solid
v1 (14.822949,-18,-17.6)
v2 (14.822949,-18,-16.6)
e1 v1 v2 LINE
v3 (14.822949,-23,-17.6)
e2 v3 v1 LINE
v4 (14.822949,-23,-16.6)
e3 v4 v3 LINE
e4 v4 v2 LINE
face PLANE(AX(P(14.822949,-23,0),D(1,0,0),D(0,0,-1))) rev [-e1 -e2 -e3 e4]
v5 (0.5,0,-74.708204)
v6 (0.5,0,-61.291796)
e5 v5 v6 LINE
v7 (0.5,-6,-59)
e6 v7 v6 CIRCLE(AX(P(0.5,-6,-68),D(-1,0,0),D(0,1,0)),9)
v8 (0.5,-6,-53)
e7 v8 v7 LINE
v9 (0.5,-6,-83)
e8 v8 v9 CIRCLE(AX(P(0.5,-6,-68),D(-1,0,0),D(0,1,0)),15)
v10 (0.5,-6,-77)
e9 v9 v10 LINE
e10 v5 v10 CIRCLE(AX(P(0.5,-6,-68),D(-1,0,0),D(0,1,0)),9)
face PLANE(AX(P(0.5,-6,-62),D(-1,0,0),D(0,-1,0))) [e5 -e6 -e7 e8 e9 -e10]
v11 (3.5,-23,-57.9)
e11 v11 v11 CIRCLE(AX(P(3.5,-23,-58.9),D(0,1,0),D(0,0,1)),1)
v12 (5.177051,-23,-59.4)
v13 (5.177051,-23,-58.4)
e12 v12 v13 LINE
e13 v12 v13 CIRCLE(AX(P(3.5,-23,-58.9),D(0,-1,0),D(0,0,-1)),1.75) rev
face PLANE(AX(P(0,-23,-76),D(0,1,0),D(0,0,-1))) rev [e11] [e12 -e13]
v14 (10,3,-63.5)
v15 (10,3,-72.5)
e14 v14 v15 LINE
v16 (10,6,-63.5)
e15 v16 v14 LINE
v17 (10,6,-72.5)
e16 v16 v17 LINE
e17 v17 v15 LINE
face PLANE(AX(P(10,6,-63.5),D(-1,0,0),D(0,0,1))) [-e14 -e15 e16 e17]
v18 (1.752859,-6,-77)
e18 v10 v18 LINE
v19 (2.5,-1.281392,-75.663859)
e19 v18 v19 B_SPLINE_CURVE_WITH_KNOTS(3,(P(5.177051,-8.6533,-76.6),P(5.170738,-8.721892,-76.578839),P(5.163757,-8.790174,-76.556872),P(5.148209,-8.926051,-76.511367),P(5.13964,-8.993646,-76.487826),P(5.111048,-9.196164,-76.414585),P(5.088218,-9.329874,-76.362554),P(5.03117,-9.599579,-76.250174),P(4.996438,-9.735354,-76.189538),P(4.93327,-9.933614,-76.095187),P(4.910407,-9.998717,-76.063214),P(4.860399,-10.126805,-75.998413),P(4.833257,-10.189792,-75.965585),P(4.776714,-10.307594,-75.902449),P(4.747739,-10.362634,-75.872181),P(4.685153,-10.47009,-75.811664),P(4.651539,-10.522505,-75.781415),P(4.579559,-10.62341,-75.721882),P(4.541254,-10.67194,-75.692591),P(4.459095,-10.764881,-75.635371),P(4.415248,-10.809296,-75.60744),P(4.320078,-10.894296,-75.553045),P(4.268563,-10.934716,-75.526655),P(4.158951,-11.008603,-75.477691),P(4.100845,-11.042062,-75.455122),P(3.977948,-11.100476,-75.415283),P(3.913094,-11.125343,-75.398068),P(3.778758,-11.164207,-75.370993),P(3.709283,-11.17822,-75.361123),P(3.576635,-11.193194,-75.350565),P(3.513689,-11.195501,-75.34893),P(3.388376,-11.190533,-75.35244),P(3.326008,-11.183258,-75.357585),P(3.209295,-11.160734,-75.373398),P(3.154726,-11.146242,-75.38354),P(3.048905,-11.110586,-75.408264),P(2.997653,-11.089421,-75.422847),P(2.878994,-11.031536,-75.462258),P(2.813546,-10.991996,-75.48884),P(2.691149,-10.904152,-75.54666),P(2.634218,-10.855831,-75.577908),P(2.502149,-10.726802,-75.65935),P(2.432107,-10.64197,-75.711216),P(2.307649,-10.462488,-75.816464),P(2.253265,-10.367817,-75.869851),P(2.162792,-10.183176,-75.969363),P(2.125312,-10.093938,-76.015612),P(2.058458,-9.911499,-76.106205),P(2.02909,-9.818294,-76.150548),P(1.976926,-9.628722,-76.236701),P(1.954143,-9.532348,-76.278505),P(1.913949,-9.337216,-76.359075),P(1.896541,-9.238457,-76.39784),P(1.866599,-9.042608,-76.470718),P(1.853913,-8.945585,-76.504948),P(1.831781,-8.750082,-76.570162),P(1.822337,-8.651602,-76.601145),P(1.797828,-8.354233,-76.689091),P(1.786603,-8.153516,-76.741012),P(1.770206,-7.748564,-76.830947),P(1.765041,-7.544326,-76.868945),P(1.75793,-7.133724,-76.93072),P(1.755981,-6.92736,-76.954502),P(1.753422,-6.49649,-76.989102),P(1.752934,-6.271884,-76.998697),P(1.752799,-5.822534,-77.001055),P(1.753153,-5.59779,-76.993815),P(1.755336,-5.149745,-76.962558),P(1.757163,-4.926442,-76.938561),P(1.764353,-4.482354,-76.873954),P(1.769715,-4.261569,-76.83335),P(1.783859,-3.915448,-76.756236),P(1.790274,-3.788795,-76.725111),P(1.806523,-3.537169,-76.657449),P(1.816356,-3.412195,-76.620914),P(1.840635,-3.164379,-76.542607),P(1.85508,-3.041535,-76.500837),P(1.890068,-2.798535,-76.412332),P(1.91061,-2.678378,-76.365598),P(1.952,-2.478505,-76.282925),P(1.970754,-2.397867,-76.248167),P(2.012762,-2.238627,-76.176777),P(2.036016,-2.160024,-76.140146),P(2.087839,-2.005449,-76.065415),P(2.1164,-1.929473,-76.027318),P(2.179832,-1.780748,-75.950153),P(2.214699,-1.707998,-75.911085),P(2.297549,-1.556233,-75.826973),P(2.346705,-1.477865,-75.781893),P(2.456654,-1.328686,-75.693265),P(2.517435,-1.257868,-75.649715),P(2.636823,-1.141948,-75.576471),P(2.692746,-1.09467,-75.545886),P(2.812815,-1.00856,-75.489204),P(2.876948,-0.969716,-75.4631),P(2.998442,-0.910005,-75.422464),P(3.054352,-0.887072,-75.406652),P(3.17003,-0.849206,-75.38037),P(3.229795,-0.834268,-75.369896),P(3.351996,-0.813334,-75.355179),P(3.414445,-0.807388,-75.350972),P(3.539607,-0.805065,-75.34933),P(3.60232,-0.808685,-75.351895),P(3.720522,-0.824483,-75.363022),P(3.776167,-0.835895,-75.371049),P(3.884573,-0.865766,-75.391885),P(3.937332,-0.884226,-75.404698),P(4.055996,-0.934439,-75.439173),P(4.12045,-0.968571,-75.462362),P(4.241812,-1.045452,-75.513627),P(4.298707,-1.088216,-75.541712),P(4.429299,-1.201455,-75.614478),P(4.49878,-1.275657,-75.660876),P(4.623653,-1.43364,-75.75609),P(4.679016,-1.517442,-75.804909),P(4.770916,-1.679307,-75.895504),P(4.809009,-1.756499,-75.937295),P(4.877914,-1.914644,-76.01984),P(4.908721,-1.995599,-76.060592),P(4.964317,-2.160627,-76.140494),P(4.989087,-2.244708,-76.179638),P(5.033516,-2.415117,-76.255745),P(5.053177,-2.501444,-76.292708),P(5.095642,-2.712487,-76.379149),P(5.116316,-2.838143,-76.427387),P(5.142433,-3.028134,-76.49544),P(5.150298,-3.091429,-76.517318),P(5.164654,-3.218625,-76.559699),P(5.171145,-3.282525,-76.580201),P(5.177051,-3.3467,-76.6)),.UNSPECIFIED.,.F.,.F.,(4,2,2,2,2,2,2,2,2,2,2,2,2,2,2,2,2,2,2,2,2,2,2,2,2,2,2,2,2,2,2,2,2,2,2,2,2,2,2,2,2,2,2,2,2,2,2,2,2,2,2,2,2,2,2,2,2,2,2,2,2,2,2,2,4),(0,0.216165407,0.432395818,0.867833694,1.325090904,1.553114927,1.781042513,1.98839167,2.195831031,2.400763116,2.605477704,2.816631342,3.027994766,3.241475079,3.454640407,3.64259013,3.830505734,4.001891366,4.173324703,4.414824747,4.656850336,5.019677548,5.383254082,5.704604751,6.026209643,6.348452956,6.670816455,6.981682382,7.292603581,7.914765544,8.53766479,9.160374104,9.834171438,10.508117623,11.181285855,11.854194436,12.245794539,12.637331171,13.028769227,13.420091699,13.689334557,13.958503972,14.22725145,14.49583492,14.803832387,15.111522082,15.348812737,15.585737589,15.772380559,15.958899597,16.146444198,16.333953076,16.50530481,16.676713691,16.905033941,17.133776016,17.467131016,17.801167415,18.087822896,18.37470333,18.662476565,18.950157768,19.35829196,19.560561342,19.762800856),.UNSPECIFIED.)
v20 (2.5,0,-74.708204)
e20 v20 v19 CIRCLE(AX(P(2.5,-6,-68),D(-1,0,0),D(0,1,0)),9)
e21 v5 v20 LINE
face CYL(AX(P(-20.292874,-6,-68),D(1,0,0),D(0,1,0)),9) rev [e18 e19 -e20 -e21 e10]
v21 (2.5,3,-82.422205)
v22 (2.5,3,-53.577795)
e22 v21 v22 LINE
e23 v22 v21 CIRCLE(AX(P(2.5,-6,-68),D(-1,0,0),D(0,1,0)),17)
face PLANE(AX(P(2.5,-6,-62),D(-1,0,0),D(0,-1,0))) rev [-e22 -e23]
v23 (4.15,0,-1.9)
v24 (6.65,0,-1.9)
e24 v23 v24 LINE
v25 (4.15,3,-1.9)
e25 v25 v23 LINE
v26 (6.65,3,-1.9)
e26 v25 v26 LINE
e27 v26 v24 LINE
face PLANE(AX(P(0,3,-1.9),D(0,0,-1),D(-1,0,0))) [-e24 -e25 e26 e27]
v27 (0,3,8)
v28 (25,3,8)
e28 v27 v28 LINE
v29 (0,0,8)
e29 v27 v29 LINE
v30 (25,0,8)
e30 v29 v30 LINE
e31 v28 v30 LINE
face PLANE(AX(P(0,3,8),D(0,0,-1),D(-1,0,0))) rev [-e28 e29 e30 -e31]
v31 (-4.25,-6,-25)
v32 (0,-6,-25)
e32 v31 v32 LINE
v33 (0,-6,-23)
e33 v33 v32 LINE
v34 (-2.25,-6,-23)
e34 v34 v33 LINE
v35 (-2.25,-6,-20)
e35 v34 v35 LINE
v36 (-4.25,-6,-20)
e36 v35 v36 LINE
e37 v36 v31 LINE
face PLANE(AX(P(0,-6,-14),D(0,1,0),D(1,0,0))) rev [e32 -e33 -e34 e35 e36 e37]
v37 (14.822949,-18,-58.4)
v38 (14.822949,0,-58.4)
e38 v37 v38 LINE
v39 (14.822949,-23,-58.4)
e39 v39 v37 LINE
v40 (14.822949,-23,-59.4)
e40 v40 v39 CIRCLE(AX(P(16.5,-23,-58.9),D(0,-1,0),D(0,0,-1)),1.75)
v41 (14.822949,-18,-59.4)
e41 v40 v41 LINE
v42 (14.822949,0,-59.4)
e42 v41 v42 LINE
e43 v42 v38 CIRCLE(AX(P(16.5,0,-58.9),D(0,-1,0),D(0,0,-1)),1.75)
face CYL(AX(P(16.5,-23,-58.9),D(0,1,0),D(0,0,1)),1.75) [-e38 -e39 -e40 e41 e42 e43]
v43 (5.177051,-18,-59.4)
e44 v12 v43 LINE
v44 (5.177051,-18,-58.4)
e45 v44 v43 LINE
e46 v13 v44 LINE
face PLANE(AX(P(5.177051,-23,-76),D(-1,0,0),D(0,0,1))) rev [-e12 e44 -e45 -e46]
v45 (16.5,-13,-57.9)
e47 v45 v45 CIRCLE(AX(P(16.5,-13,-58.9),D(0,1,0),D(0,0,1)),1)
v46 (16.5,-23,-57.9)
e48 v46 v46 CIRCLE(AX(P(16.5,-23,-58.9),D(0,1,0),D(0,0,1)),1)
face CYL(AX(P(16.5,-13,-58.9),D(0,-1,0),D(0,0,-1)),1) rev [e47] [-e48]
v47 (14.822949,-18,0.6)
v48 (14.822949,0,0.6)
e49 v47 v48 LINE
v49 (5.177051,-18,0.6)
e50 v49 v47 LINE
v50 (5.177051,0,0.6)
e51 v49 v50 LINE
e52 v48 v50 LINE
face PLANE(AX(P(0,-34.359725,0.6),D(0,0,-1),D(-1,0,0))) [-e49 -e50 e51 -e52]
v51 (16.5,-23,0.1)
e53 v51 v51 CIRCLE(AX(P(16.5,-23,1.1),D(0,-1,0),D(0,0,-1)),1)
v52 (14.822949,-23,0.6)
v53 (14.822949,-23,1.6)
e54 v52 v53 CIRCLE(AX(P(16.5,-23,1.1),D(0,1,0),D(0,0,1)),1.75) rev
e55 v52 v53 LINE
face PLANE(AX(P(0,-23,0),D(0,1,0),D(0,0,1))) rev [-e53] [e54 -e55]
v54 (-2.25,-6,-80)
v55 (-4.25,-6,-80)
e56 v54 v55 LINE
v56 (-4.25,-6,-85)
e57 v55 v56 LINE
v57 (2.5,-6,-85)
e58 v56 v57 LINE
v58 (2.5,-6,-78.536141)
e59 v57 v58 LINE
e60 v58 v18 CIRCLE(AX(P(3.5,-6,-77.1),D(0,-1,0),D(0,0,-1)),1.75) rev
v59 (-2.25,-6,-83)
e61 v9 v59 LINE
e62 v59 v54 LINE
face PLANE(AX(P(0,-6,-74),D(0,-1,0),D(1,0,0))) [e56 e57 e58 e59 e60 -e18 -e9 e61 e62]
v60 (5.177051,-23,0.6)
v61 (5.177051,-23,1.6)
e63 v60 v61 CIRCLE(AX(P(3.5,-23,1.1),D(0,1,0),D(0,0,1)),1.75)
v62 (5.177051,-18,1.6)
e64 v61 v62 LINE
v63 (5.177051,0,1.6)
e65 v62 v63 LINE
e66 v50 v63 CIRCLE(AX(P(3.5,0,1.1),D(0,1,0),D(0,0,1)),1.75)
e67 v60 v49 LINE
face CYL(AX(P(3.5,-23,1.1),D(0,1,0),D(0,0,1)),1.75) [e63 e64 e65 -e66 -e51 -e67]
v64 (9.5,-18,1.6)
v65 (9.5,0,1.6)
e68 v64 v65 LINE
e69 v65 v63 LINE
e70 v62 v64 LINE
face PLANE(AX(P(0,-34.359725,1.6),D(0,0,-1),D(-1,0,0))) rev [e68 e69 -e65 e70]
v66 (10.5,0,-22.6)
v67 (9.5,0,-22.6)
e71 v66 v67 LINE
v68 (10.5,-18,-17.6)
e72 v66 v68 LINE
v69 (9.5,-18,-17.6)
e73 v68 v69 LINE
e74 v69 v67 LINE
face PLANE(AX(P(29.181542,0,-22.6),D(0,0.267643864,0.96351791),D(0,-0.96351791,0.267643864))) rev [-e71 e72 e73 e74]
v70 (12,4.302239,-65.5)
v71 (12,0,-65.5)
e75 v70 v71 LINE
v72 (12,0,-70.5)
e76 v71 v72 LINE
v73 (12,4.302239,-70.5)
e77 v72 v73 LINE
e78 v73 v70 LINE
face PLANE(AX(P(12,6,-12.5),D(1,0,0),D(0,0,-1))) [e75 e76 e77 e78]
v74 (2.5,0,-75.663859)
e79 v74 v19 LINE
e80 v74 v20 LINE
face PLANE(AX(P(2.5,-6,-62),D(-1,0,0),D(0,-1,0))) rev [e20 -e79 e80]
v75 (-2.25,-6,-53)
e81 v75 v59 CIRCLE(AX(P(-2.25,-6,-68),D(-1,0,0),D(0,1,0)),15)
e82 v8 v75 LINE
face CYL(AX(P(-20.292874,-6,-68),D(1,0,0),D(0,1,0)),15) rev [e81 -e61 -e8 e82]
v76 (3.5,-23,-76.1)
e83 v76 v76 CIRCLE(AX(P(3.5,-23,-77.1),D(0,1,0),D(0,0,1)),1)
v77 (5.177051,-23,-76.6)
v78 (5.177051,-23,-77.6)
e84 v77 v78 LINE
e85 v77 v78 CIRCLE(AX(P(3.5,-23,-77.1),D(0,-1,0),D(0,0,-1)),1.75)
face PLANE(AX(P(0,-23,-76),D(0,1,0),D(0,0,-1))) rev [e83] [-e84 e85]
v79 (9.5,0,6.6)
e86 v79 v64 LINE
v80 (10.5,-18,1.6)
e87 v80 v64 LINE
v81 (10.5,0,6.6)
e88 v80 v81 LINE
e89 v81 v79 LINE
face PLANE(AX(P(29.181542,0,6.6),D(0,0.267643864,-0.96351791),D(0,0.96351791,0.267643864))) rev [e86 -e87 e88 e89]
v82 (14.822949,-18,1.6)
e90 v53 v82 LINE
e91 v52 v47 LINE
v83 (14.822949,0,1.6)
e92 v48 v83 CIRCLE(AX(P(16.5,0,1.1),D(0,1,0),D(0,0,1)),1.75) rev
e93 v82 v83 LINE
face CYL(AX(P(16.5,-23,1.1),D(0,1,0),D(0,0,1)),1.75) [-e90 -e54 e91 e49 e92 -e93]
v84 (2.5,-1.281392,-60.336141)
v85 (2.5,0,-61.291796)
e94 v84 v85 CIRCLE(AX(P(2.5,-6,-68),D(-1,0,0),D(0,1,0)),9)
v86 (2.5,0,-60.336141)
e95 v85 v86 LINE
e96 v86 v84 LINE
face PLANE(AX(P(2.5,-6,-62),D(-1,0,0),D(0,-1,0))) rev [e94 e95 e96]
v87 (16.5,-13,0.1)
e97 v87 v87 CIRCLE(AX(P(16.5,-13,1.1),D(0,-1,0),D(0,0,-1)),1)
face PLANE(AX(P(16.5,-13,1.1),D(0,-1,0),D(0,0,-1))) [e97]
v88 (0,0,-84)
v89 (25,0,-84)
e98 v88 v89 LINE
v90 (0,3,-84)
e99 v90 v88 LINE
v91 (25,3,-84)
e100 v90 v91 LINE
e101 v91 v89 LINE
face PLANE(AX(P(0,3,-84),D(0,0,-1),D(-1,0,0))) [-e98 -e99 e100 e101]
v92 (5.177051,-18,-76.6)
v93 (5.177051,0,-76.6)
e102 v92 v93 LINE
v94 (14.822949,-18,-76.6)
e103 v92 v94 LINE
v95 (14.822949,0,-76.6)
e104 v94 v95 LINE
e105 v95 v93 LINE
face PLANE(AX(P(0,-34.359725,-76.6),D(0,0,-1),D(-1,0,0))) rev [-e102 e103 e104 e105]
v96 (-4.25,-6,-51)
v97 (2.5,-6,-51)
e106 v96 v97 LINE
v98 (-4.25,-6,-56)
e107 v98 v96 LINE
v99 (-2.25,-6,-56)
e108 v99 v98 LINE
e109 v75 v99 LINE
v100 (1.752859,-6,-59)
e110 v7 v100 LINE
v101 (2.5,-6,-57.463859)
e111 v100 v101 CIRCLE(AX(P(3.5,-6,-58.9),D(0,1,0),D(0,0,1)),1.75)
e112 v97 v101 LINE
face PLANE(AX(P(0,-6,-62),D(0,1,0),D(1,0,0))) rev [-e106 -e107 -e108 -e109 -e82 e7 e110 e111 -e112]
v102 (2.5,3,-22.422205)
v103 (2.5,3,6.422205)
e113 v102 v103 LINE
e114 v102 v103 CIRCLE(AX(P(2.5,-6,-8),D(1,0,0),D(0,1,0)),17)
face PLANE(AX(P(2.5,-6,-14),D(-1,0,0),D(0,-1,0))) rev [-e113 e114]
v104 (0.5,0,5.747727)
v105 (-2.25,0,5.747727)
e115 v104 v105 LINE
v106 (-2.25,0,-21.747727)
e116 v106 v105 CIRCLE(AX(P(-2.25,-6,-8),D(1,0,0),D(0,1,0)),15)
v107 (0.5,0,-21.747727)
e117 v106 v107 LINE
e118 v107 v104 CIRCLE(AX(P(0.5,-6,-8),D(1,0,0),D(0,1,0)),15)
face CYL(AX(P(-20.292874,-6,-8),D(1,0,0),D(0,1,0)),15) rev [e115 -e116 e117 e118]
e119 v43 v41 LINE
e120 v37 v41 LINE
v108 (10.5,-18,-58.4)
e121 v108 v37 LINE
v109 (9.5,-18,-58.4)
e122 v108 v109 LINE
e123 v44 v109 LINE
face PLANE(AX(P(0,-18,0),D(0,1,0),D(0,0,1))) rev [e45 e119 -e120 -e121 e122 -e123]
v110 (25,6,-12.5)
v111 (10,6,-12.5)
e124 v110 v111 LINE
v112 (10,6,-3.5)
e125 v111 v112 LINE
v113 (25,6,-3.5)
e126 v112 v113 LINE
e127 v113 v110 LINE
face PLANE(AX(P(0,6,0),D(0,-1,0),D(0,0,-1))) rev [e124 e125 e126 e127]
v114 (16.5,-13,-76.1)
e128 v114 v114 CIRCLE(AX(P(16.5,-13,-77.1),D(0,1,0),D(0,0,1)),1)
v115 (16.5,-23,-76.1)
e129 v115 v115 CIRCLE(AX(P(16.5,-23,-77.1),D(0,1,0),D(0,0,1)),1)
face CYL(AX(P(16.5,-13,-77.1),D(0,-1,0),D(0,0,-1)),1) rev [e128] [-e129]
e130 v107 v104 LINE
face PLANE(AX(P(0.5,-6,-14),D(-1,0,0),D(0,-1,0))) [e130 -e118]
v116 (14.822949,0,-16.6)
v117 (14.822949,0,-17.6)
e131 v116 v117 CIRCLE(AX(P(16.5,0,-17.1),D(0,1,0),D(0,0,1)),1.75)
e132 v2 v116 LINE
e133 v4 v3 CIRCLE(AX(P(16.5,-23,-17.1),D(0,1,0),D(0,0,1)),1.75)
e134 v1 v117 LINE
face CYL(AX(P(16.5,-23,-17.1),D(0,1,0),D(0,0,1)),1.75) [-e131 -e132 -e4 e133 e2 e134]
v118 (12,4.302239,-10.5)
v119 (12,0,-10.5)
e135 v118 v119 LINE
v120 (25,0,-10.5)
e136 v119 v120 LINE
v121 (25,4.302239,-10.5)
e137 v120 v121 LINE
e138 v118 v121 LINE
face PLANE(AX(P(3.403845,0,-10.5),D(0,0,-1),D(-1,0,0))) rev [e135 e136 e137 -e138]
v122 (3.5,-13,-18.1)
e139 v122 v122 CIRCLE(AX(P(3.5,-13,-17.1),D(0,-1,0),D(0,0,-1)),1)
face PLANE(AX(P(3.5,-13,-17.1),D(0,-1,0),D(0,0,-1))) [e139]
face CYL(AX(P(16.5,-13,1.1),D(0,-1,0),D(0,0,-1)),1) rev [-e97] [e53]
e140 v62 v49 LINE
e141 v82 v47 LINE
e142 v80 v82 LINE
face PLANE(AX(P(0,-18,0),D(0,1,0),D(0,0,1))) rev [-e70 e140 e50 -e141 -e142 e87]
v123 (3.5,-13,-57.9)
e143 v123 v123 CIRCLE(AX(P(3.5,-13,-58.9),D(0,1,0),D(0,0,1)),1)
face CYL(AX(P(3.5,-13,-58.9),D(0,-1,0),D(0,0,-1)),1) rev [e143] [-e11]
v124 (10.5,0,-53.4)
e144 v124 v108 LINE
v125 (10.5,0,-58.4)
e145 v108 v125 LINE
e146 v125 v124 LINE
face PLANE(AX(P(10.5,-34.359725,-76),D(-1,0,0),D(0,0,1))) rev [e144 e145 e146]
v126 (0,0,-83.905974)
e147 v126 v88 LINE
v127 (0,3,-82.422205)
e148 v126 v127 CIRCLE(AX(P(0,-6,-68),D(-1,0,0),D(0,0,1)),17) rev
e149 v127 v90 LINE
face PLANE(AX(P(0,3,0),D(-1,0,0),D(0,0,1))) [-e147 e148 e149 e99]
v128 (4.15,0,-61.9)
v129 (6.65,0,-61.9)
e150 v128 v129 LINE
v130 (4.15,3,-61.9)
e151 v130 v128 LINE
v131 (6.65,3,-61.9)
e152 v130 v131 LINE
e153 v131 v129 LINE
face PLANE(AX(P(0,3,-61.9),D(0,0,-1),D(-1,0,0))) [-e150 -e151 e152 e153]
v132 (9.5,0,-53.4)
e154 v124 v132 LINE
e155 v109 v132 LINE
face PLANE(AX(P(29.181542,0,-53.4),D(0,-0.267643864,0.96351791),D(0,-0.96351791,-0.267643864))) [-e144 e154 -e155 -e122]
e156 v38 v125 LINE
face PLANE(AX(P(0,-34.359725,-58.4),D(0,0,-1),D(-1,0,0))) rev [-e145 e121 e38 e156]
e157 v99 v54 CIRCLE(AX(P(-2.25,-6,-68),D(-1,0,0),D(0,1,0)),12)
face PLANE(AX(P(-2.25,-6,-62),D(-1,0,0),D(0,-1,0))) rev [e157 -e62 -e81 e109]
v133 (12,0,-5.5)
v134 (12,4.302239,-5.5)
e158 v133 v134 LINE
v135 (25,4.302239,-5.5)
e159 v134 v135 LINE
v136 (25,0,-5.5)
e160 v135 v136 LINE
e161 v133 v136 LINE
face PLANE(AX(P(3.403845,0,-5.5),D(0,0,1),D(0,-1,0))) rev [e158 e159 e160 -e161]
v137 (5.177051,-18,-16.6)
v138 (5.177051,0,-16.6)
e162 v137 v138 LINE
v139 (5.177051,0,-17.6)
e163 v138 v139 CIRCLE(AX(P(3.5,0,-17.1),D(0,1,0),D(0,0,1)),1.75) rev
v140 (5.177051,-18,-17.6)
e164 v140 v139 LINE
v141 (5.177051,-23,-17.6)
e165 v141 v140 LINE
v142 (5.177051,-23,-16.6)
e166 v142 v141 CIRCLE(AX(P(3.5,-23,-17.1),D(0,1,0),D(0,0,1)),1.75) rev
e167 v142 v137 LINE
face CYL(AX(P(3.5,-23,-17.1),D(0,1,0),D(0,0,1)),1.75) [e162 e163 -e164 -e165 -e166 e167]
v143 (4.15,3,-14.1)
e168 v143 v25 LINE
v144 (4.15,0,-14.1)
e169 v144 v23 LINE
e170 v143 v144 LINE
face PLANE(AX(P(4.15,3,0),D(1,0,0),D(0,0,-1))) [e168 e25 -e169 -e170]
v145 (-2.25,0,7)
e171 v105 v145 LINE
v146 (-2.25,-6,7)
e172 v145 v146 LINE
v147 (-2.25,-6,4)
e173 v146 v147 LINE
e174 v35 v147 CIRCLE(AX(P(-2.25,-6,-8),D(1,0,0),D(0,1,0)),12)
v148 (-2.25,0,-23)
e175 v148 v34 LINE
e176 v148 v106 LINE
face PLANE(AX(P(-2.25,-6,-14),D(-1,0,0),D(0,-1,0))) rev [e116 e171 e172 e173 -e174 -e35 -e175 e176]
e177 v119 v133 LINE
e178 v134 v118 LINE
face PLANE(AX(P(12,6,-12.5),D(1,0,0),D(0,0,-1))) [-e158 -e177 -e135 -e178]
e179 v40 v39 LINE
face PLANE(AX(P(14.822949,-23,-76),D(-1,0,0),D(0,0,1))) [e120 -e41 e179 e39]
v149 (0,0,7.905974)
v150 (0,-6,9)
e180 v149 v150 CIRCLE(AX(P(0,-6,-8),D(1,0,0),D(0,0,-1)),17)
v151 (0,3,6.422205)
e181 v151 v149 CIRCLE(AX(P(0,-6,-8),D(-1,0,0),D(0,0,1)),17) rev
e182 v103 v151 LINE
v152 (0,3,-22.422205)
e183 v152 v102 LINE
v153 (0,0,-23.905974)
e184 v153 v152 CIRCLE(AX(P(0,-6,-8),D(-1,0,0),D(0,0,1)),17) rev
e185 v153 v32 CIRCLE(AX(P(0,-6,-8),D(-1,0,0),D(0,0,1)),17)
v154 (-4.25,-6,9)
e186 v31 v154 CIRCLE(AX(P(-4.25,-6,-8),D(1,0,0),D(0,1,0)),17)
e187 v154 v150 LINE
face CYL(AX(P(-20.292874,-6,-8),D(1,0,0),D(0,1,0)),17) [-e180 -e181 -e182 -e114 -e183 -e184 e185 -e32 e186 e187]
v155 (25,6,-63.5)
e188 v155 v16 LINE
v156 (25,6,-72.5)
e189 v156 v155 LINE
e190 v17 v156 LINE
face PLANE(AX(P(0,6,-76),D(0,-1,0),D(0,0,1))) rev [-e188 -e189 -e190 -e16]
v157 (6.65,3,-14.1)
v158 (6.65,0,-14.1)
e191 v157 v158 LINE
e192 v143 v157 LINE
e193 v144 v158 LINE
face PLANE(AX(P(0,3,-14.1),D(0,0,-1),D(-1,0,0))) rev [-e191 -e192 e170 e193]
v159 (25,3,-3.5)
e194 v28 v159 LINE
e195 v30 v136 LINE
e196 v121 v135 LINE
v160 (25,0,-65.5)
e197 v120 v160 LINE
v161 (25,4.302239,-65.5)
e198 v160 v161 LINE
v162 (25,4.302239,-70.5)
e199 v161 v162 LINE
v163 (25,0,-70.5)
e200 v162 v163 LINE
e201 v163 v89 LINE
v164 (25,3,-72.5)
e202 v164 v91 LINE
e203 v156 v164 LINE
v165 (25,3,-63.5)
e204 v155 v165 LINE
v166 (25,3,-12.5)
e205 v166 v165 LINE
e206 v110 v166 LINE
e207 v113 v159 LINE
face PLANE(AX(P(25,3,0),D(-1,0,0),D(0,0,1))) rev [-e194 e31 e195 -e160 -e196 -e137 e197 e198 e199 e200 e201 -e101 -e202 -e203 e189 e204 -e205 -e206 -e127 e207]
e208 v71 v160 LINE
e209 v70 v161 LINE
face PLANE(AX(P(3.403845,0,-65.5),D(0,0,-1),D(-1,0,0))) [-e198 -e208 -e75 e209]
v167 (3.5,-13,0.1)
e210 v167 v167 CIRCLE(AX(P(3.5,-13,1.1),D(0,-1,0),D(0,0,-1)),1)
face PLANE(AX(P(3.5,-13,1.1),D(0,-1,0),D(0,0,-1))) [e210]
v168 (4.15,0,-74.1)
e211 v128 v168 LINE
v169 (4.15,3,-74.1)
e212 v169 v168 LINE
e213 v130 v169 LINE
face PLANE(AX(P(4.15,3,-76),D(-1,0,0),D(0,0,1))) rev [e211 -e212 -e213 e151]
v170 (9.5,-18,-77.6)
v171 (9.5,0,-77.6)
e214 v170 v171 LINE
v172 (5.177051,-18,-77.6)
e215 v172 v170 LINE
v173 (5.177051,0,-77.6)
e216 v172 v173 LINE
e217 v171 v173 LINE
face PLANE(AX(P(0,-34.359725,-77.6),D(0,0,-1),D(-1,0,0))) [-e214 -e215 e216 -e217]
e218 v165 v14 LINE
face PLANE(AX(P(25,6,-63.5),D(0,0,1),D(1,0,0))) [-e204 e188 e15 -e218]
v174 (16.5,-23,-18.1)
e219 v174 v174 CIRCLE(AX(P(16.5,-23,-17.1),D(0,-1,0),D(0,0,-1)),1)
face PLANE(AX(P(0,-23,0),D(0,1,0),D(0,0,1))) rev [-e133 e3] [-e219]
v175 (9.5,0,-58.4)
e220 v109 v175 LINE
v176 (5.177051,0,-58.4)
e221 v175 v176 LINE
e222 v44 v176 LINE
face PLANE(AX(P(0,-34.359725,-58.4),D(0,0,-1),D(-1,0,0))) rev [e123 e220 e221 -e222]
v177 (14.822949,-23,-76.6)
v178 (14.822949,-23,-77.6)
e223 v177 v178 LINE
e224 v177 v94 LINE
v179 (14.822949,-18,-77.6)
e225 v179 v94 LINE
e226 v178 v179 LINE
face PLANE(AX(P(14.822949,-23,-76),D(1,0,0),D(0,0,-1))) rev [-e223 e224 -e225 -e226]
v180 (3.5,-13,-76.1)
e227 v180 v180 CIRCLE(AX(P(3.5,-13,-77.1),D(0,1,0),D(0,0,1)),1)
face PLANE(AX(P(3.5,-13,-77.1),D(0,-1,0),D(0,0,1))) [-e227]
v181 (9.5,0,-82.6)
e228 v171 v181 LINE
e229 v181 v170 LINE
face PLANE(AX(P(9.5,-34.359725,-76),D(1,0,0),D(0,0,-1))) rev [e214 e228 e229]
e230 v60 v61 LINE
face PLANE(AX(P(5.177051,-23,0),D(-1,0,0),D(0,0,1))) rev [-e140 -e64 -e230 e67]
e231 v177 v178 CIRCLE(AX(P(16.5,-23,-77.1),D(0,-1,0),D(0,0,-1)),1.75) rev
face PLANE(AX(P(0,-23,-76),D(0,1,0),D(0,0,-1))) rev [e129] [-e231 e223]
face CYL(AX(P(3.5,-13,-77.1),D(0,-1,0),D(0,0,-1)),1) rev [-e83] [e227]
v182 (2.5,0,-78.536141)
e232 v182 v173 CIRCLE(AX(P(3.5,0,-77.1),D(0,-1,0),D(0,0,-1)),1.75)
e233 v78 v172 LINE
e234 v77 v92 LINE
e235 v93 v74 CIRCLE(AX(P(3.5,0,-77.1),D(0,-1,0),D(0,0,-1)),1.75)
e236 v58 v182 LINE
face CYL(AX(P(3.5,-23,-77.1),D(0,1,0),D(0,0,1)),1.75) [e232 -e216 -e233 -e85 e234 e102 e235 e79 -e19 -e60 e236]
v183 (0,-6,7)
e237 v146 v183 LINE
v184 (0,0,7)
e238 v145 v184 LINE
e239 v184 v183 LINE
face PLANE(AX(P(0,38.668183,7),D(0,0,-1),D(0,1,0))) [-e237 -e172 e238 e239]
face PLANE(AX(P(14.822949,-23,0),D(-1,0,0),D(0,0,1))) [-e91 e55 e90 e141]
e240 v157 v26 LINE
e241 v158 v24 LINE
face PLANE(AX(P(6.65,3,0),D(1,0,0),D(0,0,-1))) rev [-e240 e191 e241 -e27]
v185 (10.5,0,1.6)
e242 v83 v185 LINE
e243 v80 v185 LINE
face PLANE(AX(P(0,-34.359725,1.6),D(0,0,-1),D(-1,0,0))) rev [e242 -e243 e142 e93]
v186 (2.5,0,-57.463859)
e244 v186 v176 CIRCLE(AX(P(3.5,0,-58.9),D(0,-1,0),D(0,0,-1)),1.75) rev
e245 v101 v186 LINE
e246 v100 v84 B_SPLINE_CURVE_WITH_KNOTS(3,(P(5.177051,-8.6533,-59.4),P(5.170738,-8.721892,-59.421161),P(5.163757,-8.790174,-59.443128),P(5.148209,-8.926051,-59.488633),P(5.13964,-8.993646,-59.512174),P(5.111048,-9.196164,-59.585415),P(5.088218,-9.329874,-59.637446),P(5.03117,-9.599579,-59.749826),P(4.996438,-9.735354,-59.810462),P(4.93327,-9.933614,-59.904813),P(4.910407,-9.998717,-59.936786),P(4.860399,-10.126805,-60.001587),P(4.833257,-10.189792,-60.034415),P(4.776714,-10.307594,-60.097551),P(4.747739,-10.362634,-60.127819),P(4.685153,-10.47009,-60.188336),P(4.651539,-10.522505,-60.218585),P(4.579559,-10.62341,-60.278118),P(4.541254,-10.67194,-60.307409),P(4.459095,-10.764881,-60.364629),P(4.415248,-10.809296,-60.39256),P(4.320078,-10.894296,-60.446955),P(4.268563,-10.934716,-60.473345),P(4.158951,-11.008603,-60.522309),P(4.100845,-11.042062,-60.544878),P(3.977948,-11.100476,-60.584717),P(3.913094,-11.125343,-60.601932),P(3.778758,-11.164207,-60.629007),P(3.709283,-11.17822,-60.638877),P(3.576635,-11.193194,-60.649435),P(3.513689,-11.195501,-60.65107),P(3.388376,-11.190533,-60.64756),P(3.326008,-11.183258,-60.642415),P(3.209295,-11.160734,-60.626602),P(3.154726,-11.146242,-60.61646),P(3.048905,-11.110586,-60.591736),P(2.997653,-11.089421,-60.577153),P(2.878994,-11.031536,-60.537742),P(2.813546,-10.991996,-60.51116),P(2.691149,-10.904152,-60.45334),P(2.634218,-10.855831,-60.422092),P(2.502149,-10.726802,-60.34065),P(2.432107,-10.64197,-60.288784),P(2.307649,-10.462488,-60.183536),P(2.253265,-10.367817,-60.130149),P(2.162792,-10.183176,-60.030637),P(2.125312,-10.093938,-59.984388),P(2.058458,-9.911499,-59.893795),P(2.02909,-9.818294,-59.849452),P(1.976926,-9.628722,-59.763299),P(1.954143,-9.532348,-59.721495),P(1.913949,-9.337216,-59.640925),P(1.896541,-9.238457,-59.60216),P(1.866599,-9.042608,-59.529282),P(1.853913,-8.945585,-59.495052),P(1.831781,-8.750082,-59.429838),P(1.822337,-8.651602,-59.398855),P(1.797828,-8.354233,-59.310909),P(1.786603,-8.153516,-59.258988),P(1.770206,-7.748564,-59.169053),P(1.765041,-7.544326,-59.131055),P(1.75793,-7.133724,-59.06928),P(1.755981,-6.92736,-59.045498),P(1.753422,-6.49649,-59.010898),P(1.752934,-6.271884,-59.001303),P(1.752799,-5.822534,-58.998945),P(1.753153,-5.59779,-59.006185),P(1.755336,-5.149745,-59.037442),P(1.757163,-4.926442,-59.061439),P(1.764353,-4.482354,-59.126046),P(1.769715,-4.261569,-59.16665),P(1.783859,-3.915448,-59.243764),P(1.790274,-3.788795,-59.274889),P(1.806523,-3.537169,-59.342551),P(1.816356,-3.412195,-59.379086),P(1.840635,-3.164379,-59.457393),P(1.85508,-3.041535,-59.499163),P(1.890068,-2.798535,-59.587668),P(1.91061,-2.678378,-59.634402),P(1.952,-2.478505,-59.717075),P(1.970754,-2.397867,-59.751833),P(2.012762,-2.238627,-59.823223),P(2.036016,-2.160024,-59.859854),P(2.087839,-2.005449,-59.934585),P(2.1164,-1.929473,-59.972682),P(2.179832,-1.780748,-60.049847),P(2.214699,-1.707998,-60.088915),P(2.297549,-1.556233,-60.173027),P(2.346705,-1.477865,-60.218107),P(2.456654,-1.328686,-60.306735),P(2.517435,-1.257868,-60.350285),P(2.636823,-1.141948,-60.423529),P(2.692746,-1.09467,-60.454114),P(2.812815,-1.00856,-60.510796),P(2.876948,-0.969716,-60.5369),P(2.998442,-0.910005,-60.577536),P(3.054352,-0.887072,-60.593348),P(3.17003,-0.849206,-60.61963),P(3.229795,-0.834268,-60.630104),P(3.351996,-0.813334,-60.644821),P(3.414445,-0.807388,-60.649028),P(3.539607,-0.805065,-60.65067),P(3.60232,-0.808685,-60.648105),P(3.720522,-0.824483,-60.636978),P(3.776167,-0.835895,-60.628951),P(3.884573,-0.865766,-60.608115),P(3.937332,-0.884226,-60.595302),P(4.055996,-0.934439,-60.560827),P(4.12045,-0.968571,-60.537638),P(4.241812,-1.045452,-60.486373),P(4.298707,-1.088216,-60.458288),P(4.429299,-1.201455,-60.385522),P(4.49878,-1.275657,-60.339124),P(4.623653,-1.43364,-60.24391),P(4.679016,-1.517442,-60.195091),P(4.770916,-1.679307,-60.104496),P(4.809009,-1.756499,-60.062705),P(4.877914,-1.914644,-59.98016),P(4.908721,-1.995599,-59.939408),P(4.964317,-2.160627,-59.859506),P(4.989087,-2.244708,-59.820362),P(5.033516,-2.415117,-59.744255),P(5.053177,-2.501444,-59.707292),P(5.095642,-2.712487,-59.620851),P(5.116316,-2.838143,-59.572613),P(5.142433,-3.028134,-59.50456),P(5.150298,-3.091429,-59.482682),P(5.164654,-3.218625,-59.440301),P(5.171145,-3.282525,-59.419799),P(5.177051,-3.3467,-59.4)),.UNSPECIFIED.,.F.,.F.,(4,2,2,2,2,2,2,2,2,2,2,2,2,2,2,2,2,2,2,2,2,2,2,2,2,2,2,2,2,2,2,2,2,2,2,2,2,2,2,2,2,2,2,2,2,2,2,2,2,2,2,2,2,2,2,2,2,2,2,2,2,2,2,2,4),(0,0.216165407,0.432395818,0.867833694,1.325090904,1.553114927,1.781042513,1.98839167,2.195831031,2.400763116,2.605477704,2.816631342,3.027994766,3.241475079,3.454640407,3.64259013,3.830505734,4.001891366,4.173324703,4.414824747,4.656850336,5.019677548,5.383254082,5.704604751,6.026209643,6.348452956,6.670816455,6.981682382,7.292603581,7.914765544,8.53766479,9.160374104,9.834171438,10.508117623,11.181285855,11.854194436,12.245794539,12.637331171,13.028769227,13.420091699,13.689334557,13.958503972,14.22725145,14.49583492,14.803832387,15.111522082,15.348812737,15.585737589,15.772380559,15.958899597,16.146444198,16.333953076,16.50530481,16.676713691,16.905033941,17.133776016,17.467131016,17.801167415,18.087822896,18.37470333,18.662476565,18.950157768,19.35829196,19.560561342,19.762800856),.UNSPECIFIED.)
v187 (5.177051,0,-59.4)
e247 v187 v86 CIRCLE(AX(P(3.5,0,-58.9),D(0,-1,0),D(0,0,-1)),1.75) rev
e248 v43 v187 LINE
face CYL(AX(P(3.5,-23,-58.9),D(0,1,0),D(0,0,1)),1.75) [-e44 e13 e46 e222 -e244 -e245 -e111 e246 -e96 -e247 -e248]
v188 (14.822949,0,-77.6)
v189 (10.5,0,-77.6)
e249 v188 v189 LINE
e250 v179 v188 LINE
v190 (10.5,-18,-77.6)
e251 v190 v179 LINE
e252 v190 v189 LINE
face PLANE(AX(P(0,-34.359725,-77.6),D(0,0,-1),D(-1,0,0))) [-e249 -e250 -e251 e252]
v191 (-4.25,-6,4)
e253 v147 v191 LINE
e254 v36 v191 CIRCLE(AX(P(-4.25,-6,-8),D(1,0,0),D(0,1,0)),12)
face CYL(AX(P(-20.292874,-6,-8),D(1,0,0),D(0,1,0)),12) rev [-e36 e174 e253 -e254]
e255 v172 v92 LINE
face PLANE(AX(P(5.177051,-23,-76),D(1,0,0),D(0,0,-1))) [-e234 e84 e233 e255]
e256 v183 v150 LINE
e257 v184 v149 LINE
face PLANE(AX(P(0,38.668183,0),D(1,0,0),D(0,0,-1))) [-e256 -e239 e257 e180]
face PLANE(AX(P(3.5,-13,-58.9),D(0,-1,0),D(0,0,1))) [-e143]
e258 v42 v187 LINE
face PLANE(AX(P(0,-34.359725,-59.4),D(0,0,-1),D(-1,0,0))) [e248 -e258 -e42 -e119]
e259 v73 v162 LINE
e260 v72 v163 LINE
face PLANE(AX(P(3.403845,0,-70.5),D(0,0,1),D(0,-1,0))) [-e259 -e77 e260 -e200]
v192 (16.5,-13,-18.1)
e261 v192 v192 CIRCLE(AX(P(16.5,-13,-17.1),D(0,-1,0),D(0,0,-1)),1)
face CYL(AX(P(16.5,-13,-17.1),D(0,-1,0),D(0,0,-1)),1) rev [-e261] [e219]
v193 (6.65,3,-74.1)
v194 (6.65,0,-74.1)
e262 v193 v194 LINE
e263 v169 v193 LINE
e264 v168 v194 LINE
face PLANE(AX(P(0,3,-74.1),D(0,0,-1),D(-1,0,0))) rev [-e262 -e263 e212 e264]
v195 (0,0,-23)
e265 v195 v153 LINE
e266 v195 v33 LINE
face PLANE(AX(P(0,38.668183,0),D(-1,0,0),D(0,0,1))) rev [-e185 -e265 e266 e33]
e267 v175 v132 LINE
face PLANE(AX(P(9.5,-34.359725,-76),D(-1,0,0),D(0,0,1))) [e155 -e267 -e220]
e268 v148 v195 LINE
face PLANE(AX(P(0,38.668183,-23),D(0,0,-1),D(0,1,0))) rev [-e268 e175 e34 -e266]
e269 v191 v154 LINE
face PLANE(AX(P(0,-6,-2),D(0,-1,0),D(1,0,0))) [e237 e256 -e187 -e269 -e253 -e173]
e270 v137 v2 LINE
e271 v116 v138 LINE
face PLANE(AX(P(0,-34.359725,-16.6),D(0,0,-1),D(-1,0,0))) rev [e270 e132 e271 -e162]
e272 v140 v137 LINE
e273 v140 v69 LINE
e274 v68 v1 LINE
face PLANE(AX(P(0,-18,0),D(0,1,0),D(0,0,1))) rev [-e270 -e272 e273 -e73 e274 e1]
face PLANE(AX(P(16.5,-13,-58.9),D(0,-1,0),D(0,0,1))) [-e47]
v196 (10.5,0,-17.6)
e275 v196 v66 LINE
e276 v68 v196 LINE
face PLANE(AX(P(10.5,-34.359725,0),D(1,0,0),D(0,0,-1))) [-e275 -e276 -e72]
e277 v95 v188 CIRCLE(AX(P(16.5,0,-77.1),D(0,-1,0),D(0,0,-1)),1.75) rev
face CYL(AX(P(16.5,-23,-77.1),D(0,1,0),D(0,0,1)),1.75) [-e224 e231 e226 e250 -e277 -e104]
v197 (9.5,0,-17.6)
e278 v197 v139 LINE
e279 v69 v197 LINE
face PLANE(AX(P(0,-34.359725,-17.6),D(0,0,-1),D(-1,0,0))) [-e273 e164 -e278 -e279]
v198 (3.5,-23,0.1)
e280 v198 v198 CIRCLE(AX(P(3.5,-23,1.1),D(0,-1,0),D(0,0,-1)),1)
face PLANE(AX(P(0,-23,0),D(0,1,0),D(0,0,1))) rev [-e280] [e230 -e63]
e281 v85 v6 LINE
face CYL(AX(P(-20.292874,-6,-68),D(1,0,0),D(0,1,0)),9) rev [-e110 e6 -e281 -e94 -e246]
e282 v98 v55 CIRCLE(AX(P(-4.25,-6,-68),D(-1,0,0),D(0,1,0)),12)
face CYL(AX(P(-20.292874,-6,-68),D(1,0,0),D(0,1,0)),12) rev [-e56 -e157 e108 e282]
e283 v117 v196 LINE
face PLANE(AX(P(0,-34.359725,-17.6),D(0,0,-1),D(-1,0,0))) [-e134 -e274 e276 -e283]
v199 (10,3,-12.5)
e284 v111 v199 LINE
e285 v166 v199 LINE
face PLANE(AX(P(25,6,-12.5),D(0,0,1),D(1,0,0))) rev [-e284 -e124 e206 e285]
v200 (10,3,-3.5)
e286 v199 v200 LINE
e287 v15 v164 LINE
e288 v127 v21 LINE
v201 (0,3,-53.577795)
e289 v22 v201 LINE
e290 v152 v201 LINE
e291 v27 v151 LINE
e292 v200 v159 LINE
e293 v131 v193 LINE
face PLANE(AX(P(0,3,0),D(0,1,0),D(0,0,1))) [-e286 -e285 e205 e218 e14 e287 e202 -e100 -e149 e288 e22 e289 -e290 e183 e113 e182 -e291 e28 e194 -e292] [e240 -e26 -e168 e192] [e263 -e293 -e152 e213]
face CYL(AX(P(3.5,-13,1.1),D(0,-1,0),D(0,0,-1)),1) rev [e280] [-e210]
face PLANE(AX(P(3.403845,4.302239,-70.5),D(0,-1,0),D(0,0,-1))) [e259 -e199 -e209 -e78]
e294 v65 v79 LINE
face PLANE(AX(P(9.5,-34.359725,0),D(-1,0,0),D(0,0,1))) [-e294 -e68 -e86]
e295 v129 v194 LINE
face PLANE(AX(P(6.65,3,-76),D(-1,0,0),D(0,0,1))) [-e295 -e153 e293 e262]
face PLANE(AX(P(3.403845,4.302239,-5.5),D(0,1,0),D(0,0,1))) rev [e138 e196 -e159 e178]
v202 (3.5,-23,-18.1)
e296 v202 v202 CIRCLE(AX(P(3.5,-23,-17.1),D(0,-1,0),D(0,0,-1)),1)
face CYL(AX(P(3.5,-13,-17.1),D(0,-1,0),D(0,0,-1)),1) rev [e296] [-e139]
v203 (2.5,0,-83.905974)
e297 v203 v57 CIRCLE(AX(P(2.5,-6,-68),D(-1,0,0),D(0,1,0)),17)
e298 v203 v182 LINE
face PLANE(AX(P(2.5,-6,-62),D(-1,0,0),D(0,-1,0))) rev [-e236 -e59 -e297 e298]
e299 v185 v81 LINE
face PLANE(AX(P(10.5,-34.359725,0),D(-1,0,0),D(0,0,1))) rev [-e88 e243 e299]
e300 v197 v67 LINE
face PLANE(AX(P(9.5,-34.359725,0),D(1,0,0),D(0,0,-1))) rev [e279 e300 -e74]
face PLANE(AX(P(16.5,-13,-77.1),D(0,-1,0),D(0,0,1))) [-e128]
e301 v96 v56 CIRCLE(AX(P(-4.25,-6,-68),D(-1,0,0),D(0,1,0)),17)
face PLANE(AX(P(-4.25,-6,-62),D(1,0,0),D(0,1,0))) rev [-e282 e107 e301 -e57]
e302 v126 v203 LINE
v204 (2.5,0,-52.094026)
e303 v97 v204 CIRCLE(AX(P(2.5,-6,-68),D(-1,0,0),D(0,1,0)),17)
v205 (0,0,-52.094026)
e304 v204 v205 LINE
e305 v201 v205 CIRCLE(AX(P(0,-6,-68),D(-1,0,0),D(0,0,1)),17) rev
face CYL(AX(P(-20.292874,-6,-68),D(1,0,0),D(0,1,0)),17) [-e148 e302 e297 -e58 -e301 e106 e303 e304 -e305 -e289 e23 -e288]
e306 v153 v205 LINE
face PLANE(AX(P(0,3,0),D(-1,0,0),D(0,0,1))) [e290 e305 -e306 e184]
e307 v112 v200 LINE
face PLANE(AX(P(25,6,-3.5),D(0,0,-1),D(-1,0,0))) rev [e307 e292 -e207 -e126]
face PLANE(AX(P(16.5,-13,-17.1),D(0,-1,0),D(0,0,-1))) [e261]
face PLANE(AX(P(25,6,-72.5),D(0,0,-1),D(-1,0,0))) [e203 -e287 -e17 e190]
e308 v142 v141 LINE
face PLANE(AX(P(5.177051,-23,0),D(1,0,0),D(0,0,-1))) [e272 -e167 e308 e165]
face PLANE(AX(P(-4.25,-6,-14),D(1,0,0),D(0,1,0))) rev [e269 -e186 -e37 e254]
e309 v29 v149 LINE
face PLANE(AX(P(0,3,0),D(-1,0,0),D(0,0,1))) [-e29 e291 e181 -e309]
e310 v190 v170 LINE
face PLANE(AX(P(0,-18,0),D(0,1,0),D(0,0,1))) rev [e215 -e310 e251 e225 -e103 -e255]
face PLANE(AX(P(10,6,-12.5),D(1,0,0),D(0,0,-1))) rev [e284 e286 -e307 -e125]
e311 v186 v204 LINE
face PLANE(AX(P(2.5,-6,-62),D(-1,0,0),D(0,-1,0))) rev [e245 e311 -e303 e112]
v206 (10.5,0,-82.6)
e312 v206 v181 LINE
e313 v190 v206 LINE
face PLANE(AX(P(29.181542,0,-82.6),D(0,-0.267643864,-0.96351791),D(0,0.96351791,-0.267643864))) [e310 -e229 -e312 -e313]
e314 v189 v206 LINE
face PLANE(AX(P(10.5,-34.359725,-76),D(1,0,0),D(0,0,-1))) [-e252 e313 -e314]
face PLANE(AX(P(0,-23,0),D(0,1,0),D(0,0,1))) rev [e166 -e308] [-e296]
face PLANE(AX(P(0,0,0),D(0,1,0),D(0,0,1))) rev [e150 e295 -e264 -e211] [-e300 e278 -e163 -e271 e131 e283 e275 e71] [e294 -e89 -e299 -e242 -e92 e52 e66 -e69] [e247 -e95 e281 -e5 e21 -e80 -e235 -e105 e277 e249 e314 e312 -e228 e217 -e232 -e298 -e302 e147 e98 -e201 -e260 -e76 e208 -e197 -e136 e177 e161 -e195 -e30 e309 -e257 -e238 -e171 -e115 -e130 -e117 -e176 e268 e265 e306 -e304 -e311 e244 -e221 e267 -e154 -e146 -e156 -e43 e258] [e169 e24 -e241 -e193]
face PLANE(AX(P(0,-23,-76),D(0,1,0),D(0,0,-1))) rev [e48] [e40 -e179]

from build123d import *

# Parameters (mm, degrees)
SKETCH1_W           = 25
SKETCH1_H           = 46
SKETCH1_W_2         = 2.5
SKETCH1_H_2         = 12.2
BOSS_EXTRUDE1_DEPTH = 3
R_VOLUTION1_START   = -4.25
R_VOLUTION1_DEPTH   = 6.75
R_VOLUTION1_START_2 = 0.5
R_VOLUTION1_2_DEPTH = 2
R_VOLUTION1_3_DEPTH = 2
SKETCH9_W           = 11.354173072
SKETCH9_H           = 3.73743218
SKETCH9_W_2         = 2
SKETCH9_H_2         = 6
CUT_EXTRUDE2_DEPTH  = 6
CUT_EXTRUDE8_DEPTH  = 0.5
BOSS_EXTRUDE2_DEPTH = 23
SKETCH10_R          = 1
CUT_EXTRUDE3_DEPTH  = 10
SKETCH11_W          = 15
SKETCH11_H          = 9
BOSS_EXTRUDE3_DEPTH = 3
SKETCH12_W          = 5
SKETCH12_H          = 4.302239334
CUT_EXTRUDE4_DEPTH  = 13
SKETCH1_10_W        = 1
SKETCH1_10_H        = 5
BOSS_EXTRUDE4_DEPTH = 18
CUT_EXTRUDE5_DEPTH  = 1
CUT_EXTRUDE9_DEPTH  = 0.5


with BuildPart() as part:
    # Sketch1 → Boss-Extrude1 (new body)
    with BuildSketch(Plane(origin=(0, 0, 0), x_dir=(1, 0, 0), z_dir=(0, 1, 0))):
        with Locations((12.5, 15)):
            Rectangle(SKETCH1_W, SKETCH1_H)
        with Locations((5.4, 8)):
            Rectangle(SKETCH1_W_2, SKETCH1_H_2, mode=Mode.SUBTRACT)
    boss_extrude1 = extrude(amount=BOSS_EXTRUDE1_DEPTH)

    # Révolution1: read off the stored shape, not the designer's step
    # Révolution1 outline → Révolution1 (add)
    with BuildSketch(Plane.YZ.offset(R_VOLUTION1_START)):
        with BuildLine():
            Line((-6, 9), (-6, 7))
            ThreePointArc((-6, 7), (9, -8), (-6, -23))
            Line((-6, -23), (-6, -25))
            ThreePointArc((-6, -25), (11, -8), (-6, 9))
        make_face()
    r_volution1 = extrude(amount=R_VOLUTION1_DEPTH)

    # R_volution1 2 outline → R_volution1 2 (add)
    with BuildSketch(Plane.YZ.offset(R_VOLUTION1_START_2)):
        with BuildLine():
            ThreePointArc((-6, 1), (-2.788601192, 0.407551231), (0, -1.291796068))
            Line((0, -1.291796068), (0, 5.747727085))
            ThreePointArc((0, 5.747727085), (-2.935355345, 6.683594694), (-6, 7))
            Line((-6, 7), (-6, 1))
        make_face()
        with BuildLine():
            ThreePointArc((0, -14.708203932), (-2.788601192, -16.407551231), (-6, -17))
            Line((-6, -17), (-6, -23))
            ThreePointArc((-6, -23), (-2.935355345, -22.683594694), (0, -21.747727085))
            Line((0, -21.747727085), (0, -14.708203932))
        make_face()
        with BuildLine():
            Line((3, 4), (3, -20))
            ThreePointArc((3, -20), (9, -8), (3, 4))
        make_face()
    r_volution1_2 = extrude(amount=R_VOLUTION1_2_DEPTH)

    # R_volution1 3 outline → R_volution1 3 (add)
    with BuildSketch(Plane.YZ.offset(R_VOLUTION1_START)):
        with BuildLine():
            Line((-6, 7), (-6, 4))
            ThreePointArc((-6, 4), (6, -8), (-6, -20))
            Line((-6, -20), (-6, -23))
            ThreePointArc((-6, -23), (9, -8), (-6, 7))
        make_face()
    r_volution1_3 = extrude(amount=R_VOLUTION1_3_DEPTH)

    # Sketch9 → Cut-Extrude2 (cut)
    with BuildSketch(Plane(origin=(0, -6, 0), x_dir=(-1, 0, 0), z_dir=(0, -1, 0))):
        with Locations((-5.677086536, 24.86871609)):
            Rectangle(SKETCH9_W, SKETCH9_H)
        Polygon((0, -9), (0, -7), (-0.5, -7), (-2.5, -7), (-2.5, -9), align=None)
        Polygon((0, -9.458628642), (0, -9), (-2.5, -9), (-2.5, -7), (-11.354173072, -7), (-11.354173072, -9.458628642), align=None)
        with Locations((-1.5, -4)):
            Rectangle(SKETCH9_W_2, SKETCH9_H_2)
        Polygon((0, -7), (2.25, -7), (2.25, -4), (2.25, 23), (0, 23), (-11.354173072, 23), (-11.354173072, -7), (-2.5, -7), (-2.5, -1), (-0.5, -1), (-0.5, -7), align=None)
    extrude(amount=-CUT_EXTRUDE2_DEPTH, mode=Mode.SUBTRACT)

    # Cut-Extrude8: read off the stored shape, not the designer's step
    # Cut-Extrude8 outline → Cut-Extrude8 (cut)
    with BuildSketch(Plane.YZ):
        with BuildLine():
            Line((0, 5.747727085), (0, -21.747727085))
            ThreePointArc((0, -21.747727085), (1.550737546, -20.960955309), (3, -20))
            Line((3, -20), (3, 4))
            ThreePointArc((3, 4), (1.550737546, 4.960955309), (0, 5.747727085))
        make_face()
    extrude(amount=CUT_EXTRUDE8_DEPTH, mode=Mode.SUBTRACT)

    # Sketch1<9> → Boss-Extrude2 (add)
    with BuildSketch(Plane(origin=(0, 0, 0), x_dir=(1, 0, 0), z_dir=(0, 1, 0))):
        with BuildLine():
            ThreePointArc((5.177050983, 17.6), (1.75, 17.1), (5.177050983, 16.6))
            Line((5.177050983, 16.6), (5.177050983, 17.6))
        make_face()
        with BuildLine():
            Line((5.177050983, -1.6), (5.177050983, -0.6))
            ThreePointArc((5.177050983, -0.6), (1.75, -1.1), (5.177050983, -1.6))
        make_face()
        with BuildLine():
            ThreePointArc((14.822949017, 16.6), (18.25, 17.1), (14.822949017, 17.6))
            Line((14.822949017, 17.6), (14.822949017, 16.6))
        make_face()
        with BuildLine():
            Line((14.822949017, -0.6), (14.822949017, -1.6))
            ThreePointArc((14.822949017, -1.6), (18.25, -1.1), (14.822949017, -0.6))
        make_face()
    boss_extrude2 = extrude(amount=-BOSS_EXTRUDE2_DEPTH)

    # Sketch10 → Cut-Extrude3 (cut)
    with BuildSketch(Plane(origin=(0, -23, 0), x_dir=(-1, 0, 0), z_dir=(0, -1, 0))):
        with Locations(Location((-3.5, -1.1, 0), (0, 0, 90))):
            Circle(SKETCH10_R)
        with Locations(Location((-16.5, -1.1, 0), (0, 0, 90))):
            Circle(SKETCH10_R)
        with Locations(Location((-16.5, 17.1, 0), (0, 0, 90))):
            Circle(SKETCH10_R)
        with Locations(Location((-3.5, 17.1, 0), (0, 0, 90))):
            Circle(SKETCH10_R)
    cut_extrude3 = extrude(amount=-CUT_EXTRUDE3_DEPTH, mode=Mode.SUBTRACT)

    # Sketch11 → Boss-Extrude3 (add)
    with BuildSketch(Plane(origin=(0, 3, 0), x_dir=(1, 0, 0), z_dir=(0, 1, 0))):
        with Locations((17.5, 8)):
            Rectangle(SKETCH11_W, SKETCH11_H)
    boss_extrude3 = extrude(amount=BOSS_EXTRUDE3_DEPTH)

    # Sketch12 → Cut-Extrude4 (cut)
    with BuildSketch(Plane(origin=(25, 0, 0), x_dir=(0, 0, -1), z_dir=(1, 0, 0))):
        with Locations((8, 2.151119667)):
            Rectangle(SKETCH12_W, SKETCH12_H)
    cut_extrude4 = extrude(amount=-CUT_EXTRUDE4_DEPTH, mode=Mode.SUBTRACT)

    # Sketch1<10> → Boss-Extrude4 (add)
    with BuildSketch(Plane(origin=(0, 0, 0), x_dir=(1, 0, 0), z_dir=(0, 1, 0))):
        with BuildLine():
            Line((14.822949017, -1.6), (14.822949017, -0.6))
            ThreePointArc((14.822949017, -0.6), (14.75, -1.1), (14.822949017, -1.6))
        make_face()
        with BuildLine():
            Line((14.822949017, -0.6), (13.541960108, -0.6))
            ThreePointArc((13.541960108, -0.6), (13.5, -1.1), (13.541960108, -1.6))
            Line((13.541960108, -1.6), (14.822949017, -1.6))
            ThreePointArc((14.822949017, -1.6), (14.75, -1.1), (14.822949017, -0.6))
        make_face()
        with BuildLine():
            ThreePointArc((6.5, -1.1), (6.489491568, -1.350878781), (6.458039892, -1.6))
            Line((6.458039892, -1.6), (9.5, -1.6))
            Line((9.5, -1.6), (10.5, -1.6))
            Line((10.5, -1.6), (13.541960108, -1.6))
            ThreePointArc((13.541960108, -1.6), (13.5, -1.1), (13.541960108, -0.6))
            Line((13.541960108, -0.6), (6.458039892, -0.6))
            ThreePointArc((6.458039892, -0.6), (6.489491568, -0.849121219), (6.5, -1.1))
        make_face()
        with Locations((10, -4.1)):
            Rectangle(SKETCH1_10_W, SKETCH1_10_H)
        with BuildLine():
            Line((5.177050983, -1.6), (6.458039892, -1.6))
            ThreePointArc((6.458039892, -1.6), (6.489491568, -1.350878781), (6.5, -1.1))
            ThreePointArc((6.5, -1.1), (6.489491568, -0.849121219), (6.458039892, -0.6))
            Line((6.458039892, -0.6), (5.177050983, -0.6))
            ThreePointArc((5.177050983, -0.6), (5.231666715, -0.847353231), (5.25, -1.1))
            ThreePointArc((5.25, -1.1), (5.231666715, -1.352646769), (5.177050983, -1.6))
        make_face()
        with BuildLine():
            Line((5.177050983, -0.6), (5.177050983, -1.6))
            ThreePointArc((5.177050983, -1.6), (5.231666715, -1.352646769), (5.25, -1.1))
            ThreePointArc((5.25, -1.1), (5.231666715, -0.847353231), (5.177050983, -0.6))
        make_face()
        with BuildLine():
            ThreePointArc((13.541960108, 17.6), (13.5, 17.1), (13.541960108, 16.6))
            Line((13.541960108, 16.6), (14.822949017, 16.6))
            ThreePointArc((14.822949017, 16.6), (14.75, 17.1), (14.822949017, 17.6))
            Line((14.822949017, 17.6), (13.541960108, 17.6))
        make_face()
        with BuildLine():
            ThreePointArc((14.822949017, 17.6), (14.75, 17.1), (14.822949017, 16.6))
            Line((14.822949017, 16.6), (14.822949017, 17.6))
        make_face()
        with BuildLine():
            Line((9.5, 17.6), (6.458039892, 17.6))
            ThreePointArc((6.458039892, 17.6), (6.489491568, 17.350878781), (6.5, 17.1))
            ThreePointArc((6.5, 17.1), (6.489491568, 16.849121219), (6.458039892, 16.6))
            Line((6.458039892, 16.6), (13.541960108, 16.6))
            ThreePointArc((13.541960108, 16.6), (13.5, 17.1), (13.541960108, 17.6))
            Line((13.541960108, 17.6), (10.5, 17.6))
            Line((10.5, 17.6), (9.5, 17.6))
        make_face()
        with BuildLine():
            ThreePointArc((6.5, 17.1), (6.489491568, 17.350878781), (6.458039892, 17.6))
            Line((6.458039892, 17.6), (5.177050983, 17.6))
            ThreePointArc((5.177050983, 17.6), (5.231666715, 17.352646769), (5.25, 17.1))
            ThreePointArc((5.25, 17.1), (5.231666715, 16.847353231), (5.177050983, 16.6))
            Line((5.177050983, 16.6), (6.458039892, 16.6))
            ThreePointArc((6.458039892, 16.6), (6.489491568, 16.849121219), (6.5, 17.1))
        make_face()
        with BuildLine():
            ThreePointArc((5.25, 17.1), (5.231666715, 17.352646769), (5.177050983, 17.6))
            Line((5.177050983, 17.6), (5.177050983, 16.6))
            ThreePointArc((5.177050983, 16.6), (5.231666715, 16.847353231), (5.25, 17.1))
        make_face()
        with Locations((10, 20.1)):
            Rectangle(SKETCH1_10_W, SKETCH1_10_H)
    boss_extrude4 = extrude(amount=-BOSS_EXTRUDE4_DEPTH)

    # Sketch14 → Cut-Extrude5 (cut)
    with BuildSketch(Plane.ZY.offset(-9.5)):
        Polygon((-22.6, 0), (-17.6, -18), (-22.6, -18), align=None)
        Polygon((6.6, -18), (6.6, 0), (1.6, -18), align=None)
    cut_extrude5 = extrude(amount=-CUT_EXTRUDE5_DEPTH, mode=Mode.SUBTRACT)

    # Mirror2: Boss-Extrude1, Révolution1, R_volution1 2, R_volution1 3, Boss-Extrude2, Cut-Extrude3, Boss-Extrude3, Cut-Extrude4, Boss-Extrude4, Cut-Extrude5 across plane
    add(boss_extrude1.mirror(Plane(origin=(0, 3, -38), x_dir=(1, 0, 0), z_dir=(0, 0, -1))))
    add(r_volution1.mirror(Plane(origin=(0, 3, -38), x_dir=(1, 0, 0), z_dir=(0, 0, -1))))
    add(r_volution1_2.mirror(Plane(origin=(0, 3, -38), x_dir=(1, 0, 0), z_dir=(0, 0, -1))))
    add(r_volution1_3.mirror(Plane(origin=(0, 3, -38), x_dir=(1, 0, 0), z_dir=(0, 0, -1))))
    add(boss_extrude2.mirror(Plane(origin=(0, 3, -38), x_dir=(1, 0, 0), z_dir=(0, 0, -1))))
    add(cut_extrude3.mirror(Plane(origin=(0, 3, -38), x_dir=(1, 0, 0), z_dir=(0, 0, -1))), mode=Mode.SUBTRACT)
    add(boss_extrude3.mirror(Plane(origin=(0, 3, -38), x_dir=(1, 0, 0), z_dir=(0, 0, -1))))
    add(cut_extrude4.mirror(Plane(origin=(0, 3, -38), x_dir=(1, 0, 0), z_dir=(0, 0, -1))), mode=Mode.SUBTRACT)
    add(boss_extrude4.mirror(Plane(origin=(0, 3, -38), x_dir=(1, 0, 0), z_dir=(0, 0, -1))))
    add(cut_extrude5.mirror(Plane(origin=(0, 3, -38), x_dir=(1, 0, 0), z_dir=(0, 0, -1))), mode=Mode.SUBTRACT)

    # Cut-Extrude9: read off the stored shape, not the designer's step
    # Cut-Extrude9 outline → Cut-Extrude9 (cut)
    with BuildSketch(Plane.YZ):
        with BuildLine():
            Line((0, -54.252272915), (0, -81.747727085))
            ThreePointArc((0, -81.747727085), (1.550737546, -80.960955309), (3, -80))
            Line((3, -80), (3, -56))
            ThreePointArc((3, -56), (1.550737546, -55.039044691), (0, -54.252272915))
        make_face()
    extrude(amount=CUT_EXTRUDE9_DEPTH, mode=Mode.SUBTRACT)


solid = part.part
